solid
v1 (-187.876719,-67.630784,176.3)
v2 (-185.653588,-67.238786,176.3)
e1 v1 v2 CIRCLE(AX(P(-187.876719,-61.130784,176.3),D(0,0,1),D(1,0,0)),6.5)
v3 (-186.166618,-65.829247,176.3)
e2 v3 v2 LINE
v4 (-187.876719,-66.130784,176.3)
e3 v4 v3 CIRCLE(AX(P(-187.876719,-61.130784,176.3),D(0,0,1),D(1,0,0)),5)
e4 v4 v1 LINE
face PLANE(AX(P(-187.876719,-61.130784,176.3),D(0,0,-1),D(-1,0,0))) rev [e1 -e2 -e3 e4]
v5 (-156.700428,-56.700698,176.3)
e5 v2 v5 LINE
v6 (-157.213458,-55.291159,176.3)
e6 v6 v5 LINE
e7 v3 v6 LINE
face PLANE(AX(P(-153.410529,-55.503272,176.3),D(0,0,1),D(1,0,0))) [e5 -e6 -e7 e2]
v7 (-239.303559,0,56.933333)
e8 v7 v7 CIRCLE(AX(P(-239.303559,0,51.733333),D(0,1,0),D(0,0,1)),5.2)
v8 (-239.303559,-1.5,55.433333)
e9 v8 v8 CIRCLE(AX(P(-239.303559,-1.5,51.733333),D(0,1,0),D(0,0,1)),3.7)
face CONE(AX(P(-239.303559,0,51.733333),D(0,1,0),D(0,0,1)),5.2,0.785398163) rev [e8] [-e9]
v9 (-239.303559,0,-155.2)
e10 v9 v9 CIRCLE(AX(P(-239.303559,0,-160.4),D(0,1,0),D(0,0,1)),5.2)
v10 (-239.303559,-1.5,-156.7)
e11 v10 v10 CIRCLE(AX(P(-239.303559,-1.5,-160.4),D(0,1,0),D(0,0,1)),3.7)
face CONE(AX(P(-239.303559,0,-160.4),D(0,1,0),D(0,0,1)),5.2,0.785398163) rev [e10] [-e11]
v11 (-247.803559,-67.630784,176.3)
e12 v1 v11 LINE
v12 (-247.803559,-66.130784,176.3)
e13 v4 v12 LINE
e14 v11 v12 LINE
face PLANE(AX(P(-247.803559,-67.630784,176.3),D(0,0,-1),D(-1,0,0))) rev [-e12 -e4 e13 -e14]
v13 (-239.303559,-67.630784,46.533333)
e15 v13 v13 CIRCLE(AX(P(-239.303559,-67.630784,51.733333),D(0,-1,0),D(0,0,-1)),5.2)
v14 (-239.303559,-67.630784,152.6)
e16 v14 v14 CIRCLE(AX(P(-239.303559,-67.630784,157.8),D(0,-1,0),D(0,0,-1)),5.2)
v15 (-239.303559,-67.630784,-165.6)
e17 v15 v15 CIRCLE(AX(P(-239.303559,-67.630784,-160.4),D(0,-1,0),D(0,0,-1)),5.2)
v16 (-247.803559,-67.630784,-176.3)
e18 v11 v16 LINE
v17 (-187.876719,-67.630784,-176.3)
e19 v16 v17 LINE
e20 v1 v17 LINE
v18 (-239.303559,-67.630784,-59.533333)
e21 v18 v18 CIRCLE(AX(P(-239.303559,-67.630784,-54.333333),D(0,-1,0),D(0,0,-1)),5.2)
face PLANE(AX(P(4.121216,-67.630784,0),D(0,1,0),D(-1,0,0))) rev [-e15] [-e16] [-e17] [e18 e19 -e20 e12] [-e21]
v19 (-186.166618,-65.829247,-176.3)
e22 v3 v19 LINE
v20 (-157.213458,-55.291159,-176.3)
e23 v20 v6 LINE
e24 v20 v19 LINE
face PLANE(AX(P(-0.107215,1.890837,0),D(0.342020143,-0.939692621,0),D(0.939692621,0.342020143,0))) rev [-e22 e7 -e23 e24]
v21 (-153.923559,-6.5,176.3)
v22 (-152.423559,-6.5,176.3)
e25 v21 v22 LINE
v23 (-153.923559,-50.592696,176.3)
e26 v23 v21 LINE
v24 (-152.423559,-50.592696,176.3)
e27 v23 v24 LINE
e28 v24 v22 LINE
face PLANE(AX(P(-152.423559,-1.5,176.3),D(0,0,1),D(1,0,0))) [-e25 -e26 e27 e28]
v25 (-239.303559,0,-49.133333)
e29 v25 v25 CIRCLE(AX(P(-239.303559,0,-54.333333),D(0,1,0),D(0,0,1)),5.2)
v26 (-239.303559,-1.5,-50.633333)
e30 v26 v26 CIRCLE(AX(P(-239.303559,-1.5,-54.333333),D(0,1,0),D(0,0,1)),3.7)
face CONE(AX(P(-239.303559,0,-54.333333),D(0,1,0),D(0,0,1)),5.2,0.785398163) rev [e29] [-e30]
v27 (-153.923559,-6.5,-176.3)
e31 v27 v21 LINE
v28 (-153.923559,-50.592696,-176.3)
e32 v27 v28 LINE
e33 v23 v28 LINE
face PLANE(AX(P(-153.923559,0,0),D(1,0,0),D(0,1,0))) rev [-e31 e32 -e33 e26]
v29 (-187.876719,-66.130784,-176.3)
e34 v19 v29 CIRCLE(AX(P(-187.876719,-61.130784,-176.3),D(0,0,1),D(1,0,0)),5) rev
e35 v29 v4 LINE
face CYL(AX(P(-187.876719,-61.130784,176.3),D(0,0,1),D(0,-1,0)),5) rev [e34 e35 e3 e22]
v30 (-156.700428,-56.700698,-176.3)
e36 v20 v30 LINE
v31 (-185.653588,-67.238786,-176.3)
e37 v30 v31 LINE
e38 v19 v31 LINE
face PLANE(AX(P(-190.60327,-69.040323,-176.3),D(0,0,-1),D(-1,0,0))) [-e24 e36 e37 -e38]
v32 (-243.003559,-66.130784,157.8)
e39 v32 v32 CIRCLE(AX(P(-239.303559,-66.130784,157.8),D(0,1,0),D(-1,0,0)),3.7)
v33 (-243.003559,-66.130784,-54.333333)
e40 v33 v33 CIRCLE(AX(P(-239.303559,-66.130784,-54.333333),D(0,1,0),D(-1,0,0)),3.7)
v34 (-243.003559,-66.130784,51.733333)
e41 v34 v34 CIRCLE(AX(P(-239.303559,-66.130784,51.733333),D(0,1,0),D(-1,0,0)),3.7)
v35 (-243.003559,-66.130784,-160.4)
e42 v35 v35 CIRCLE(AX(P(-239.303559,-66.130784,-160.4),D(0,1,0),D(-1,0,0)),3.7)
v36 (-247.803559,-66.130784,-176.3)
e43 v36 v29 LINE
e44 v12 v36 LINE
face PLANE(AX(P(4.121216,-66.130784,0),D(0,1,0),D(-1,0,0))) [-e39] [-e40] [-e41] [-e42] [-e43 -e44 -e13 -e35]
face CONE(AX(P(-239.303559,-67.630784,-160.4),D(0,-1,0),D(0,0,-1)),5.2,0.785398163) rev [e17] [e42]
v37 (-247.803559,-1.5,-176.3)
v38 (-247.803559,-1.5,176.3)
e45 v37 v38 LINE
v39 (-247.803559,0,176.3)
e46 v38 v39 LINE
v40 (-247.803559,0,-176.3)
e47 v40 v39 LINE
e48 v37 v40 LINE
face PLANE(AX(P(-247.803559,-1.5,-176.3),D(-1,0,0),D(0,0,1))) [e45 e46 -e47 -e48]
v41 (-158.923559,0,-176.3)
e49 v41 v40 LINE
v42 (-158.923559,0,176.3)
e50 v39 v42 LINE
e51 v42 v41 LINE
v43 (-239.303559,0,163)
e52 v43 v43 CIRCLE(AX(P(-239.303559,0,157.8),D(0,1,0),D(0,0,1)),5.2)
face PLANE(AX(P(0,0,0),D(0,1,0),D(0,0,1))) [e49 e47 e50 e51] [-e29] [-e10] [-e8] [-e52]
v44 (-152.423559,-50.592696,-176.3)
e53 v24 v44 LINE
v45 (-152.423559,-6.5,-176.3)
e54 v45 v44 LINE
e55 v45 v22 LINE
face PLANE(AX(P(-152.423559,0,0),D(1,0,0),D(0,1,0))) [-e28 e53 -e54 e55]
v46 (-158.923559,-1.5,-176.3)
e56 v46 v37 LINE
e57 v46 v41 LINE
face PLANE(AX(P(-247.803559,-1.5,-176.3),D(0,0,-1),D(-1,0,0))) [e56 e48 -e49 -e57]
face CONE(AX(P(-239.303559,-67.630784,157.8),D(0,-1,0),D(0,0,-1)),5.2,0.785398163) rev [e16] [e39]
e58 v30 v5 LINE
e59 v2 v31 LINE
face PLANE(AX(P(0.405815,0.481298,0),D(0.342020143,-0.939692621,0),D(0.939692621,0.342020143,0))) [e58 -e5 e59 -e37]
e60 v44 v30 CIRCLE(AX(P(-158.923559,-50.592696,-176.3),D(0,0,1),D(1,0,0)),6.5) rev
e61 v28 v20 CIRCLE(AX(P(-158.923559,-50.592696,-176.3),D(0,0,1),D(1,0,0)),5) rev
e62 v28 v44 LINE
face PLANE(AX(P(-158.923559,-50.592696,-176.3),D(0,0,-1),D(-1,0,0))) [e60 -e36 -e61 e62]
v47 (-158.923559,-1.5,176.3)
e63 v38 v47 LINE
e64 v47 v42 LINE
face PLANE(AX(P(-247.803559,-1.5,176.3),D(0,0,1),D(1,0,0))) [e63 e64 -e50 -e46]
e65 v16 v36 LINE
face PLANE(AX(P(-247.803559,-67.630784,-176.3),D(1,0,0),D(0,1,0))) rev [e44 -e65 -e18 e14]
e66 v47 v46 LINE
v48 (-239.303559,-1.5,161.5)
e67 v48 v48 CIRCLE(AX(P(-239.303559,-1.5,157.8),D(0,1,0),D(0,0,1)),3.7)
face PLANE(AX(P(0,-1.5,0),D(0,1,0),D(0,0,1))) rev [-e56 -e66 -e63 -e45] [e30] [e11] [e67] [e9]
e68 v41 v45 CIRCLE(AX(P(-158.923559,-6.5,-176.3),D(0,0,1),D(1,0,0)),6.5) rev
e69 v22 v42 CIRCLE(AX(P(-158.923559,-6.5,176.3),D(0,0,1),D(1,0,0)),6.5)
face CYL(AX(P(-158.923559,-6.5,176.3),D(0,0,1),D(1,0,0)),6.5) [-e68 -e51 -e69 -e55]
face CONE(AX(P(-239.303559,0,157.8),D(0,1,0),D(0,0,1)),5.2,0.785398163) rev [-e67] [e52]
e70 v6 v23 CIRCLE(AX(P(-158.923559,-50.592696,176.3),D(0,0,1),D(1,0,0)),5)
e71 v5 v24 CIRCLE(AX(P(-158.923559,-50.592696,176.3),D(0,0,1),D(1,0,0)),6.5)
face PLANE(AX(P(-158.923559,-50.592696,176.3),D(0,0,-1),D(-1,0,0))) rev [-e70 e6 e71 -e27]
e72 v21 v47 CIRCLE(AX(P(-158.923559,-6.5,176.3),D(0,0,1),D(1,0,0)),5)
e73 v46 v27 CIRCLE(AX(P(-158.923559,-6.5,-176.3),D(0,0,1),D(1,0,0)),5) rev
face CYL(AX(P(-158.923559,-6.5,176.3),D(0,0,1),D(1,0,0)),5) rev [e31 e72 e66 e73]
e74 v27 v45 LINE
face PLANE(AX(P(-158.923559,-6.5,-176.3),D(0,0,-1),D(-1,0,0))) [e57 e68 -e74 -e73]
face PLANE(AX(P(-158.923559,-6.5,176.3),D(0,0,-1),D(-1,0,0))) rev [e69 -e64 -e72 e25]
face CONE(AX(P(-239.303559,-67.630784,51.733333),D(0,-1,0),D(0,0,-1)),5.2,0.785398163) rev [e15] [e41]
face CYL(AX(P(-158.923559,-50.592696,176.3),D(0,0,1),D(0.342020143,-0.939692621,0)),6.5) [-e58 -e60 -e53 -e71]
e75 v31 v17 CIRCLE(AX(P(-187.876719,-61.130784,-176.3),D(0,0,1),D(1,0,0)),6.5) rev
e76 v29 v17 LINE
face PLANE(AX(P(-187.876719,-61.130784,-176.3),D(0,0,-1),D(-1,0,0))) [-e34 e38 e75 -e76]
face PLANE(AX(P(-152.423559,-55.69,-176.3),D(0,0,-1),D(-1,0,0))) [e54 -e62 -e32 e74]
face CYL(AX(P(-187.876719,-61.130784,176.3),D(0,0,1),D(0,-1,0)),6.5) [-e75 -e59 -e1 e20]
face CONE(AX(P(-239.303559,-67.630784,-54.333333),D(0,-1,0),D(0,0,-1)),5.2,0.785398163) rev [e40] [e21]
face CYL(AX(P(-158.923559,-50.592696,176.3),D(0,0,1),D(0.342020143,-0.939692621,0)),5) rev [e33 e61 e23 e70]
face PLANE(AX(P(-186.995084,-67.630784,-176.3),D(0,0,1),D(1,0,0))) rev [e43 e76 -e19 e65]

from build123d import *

# Parameters (mm, degrees)
CROQUIS2_W                                           = 95.38
CROQUIS2_H                                           = 352.6
BRIDA_BASE1_DEPTH                                    = 1.5
BRIDA_DE_ARISTA1_STRIP_W                             = 16
BRIDA_DE_ARISTA1_STRIP_H                             = 1.5
BRIDA_DE_ARISTA1_STRIP_CUT_DEPTH                     = 352.6
BRIDA_DE_ARISTA1_DEPTH                               = 352.6
BRIDA_START                                          = -176.3
BRIDA_DE_ARISTA2_DEPTH                               = 352.6
BRIDA_DE_ARISTA2_2_DEPTH                             = 352.6
BRIDA_DE_ARISTA3_DEPTH                               = 352.6
BRIDA_DE_ARISTA3_2_DEPTH                             = 352.6
CROQUIS22_R                                          = 2.25
CORTAR_EXTRUIR4_DEPTH                                = 312.548097
AVELLANADO_PARA_TORNILLO_CON_CABEZA_PLAN_D           = 5.5
AVELLANADO_PARA_TORNILLO_CON_CABEZA_PLAN_CSINK_D     = 10.4
AVELLANADO_PARA_TORNILLO_CON_CABEZA_PLAN_CSINK_ANGLE = 90
AVELLANADO_PARA_TORNILLO_CON_CABEZA_2_D              = 5.5
AVELLANADO_PARA_TORNILLO_CON_CABEZA_2_CSINK_D        = 10.4
AVELLANADO_PARA_TORNILLO_CON_CABEZA_2_CSINK_ANGLE    = 90


# Read off the part's stored shape, not the designer's step: Brida de arista2, Brida de arista3
# Sheet-metal steps are written as plain solids
with BuildPart() as part:
    # Croquis2 → Brida base1 (new body)
    with BuildSketch(Plane(origin=(0, 0, 0), x_dir=(1, 0, 0), z_dir=(0, 1, 0))):
        with Locations((-200.113558854, 0)):
            Rectangle(CROQUIS2_W, CROQUIS2_H)
    extrude(amount=-BRIDA_BASE1_DEPTH)

    # Brida de arista1 strip (across the edge) → Brida de arista1 strip cut (cut)
    with BuildSketch(Plane(origin=(-152.423558854, -1.5, -176.3), x_dir=(-1, 0, 0), z_dir=(0, 0, 1))):
        with Locations((-1.5, -0.75)):
            Rectangle(BRIDA_DE_ARISTA1_STRIP_W, BRIDA_DE_ARISTA1_STRIP_H)
    extrude(amount=BRIDA_DE_ARISTA1_STRIP_CUT_DEPTH, mode=Mode.SUBTRACT)

    # Brida de arista1 section (across the edge) → Brida de arista1 (add)
    with BuildSketch(Plane(origin=(-152.423558854, -1.5, -176.3), x_dir=(-1, 0, 0), z_dir=(0, 0, 1))):
        with BuildLine():
            Line((0, 5), (0, 54.19))
            Line((0, 54.19), (1.5, 54.19))
            Line((1.5, 54.19), (1.5, 5))
            ThreePointArc((1.5, 5), (2.964466094, 1.464466094), (6.5, 0))
            Line((6.5, 0), (6.5, -1.5))
            ThreePointArc((6.5, -1.5), (1.903805922, 0.403805922), (0, 5))
        make_face()
    extrude(amount=BRIDA_DE_ARISTA1_DEPTH)

    # Brida de arista2 outline → Brida de arista2 (cut)
    with BuildSketch(Plane.XY.offset(BRIDA_START)):
        with BuildLine():
            ThreePointArc((-152.423558854, -50.59269565), (-152.810049223, -52.800635867), (-153.923558854, -54.746007582))
            Line((-153.923558854, -54.746007582), (-153.923558854, -55.69))
            Line((-153.923558854, -55.69), (-152.423558854, -55.69))
            Line((-152.423558854, -55.69), (-152.423558854, -50.59269565))
        make_face()
    extrude(amount=BRIDA_DE_ARISTA2_DEPTH, mode=Mode.SUBTRACT)

    # Brida de arista2 2 outline → Brida de arista2 2 (add)
    with BuildSketch(Plane.XY.offset(BRIDA_START)):
        with BuildLine():
            Line((-190.603270036, -69.040323072), (-156.700427922, -56.700697685))
            ThreePointArc((-156.700427922, -56.700697685), (-155.182087424, -55.90789946), (-153.923558854, -54.746007582))
            Line((-153.923558854, -54.746007582), (-153.923558854, -50.59269565))
            ThreePointArc((-153.923558854, -50.59269565), (-154.827798632, -53.460577832), (-157.213458137, -55.291158754))
            Line((-157.213458137, -55.291158754), (-191.116300251, -67.630784141))
            Line((-191.116300251, -67.630784141), (-190.603270036, -69.040323072))
        make_face()
    extrude(amount=BRIDA_DE_ARISTA2_2_DEPTH)

    # Brida de arista3 outline → Brida de arista3 (cut)
    with BuildSketch(Plane.XY.offset(BRIDA_START)):
        with BuildLine():
            Line((-187.876719026, -67.630784141), (-191.116300251, -67.630784141))
            Line((-191.116300251, -67.630784141), (-190.603270036, -69.040323072))
            Line((-190.603270036, -69.040323072), (-185.653588094, -67.238786176))
            ThreePointArc((-185.653588094, -67.238786176), (-186.748005871, -67.532034535), (-187.876719026, -67.630784141))
        make_face()
    extrude(amount=BRIDA_DE_ARISTA3_DEPTH, mode=Mode.SUBTRACT)

    # Brida de arista3 2 outline → Brida de arista3 2 (add)
    with BuildSketch(Plane.XY.offset(BRIDA_START)):
        with BuildLine():
            Line((-247.803558854, -66.130784141), (-247.803558854, -67.630784141))
            Line((-247.803558854, -67.630784141), (-191.116300251, -67.630784141))
            Line((-191.116300251, -67.630784141), (-186.166618309, -65.829247245))
            ThreePointArc((-186.166618309, -65.829247245), (-187.008478137, -66.054822906), (-187.876719026, -66.130784141))
            Line((-187.876719026, -66.130784141), (-247.803558854, -66.130784141))
        make_face()
    extrude(amount=BRIDA_DE_ARISTA3_2_DEPTH)

    # Croquis22 → Cortar-Extruir4 (cut, through all)
    with BuildSketch(Plane.XZ):
        with Locations(Location((-239.303558854, 157.8, 0), (0, 0, 180))):
            Circle(CROQUIS22_R)
        with Locations(Location((-239.303558854, 51.733333333, 0), (0, 0, 180))):
            Circle(CROQUIS22_R)
        with Locations(Location((-239.303558854, -54.333333333, 0), (0, 0, 180))):
            Circle(CROQUIS22_R)
        with Locations(Location((-239.303558854, -160.4, 0), (0, 0, 180))):
            Circle(CROQUIS22_R)
    extrude(amount=CORTAR_EXTRUIR4_DEPTH, mode=Mode.SUBTRACT)

    # Avellanado para tornillo con cabeza plan (through all)
    with Locations(Plane(origin=(0, 0, 0), x_dir=(1, 0, 0), z_dir=(0, 1, 0))):
        with Locations((-239.303558854, 160.4), (-239.303558854, 54.333333333), (-239.303558854, -51.733333333), (-239.303558854, -157.8)):
            CounterSinkHole(AVELLANADO_PARA_TORNILLO_CON_CABEZA_PLAN_D / 2, AVELLANADO_PARA_TORNILLO_CON_CABEZA_PLAN_CSINK_D / 2, counter_sink_angle=AVELLANADO_PARA_TORNILLO_CON_CABEZA_PLAN_CSINK_ANGLE)

    # Avellanado para tornillo con cabeza  2 (through all)
    with Locations(Plane(origin=(0, -67.630784141, 0), x_dir=(-1, 0, 0), z_dir=(0, -1, 0))):
        with Locations((239.303558854, 160.4), (239.303558854, 54.333333333), (239.303558854, -51.733333333), (239.303558854, -157.8)):
            CounterSinkHole(AVELLANADO_PARA_TORNILLO_CON_CABEZA_2_D / 2, AVELLANADO_PARA_TORNILLO_CON_CABEZA_2_CSINK_D / 2, counter_sink_angle=AVELLANADO_PARA_TORNILLO_CON_CABEZA_2_CSINK_ANGLE)


solid = part.part
